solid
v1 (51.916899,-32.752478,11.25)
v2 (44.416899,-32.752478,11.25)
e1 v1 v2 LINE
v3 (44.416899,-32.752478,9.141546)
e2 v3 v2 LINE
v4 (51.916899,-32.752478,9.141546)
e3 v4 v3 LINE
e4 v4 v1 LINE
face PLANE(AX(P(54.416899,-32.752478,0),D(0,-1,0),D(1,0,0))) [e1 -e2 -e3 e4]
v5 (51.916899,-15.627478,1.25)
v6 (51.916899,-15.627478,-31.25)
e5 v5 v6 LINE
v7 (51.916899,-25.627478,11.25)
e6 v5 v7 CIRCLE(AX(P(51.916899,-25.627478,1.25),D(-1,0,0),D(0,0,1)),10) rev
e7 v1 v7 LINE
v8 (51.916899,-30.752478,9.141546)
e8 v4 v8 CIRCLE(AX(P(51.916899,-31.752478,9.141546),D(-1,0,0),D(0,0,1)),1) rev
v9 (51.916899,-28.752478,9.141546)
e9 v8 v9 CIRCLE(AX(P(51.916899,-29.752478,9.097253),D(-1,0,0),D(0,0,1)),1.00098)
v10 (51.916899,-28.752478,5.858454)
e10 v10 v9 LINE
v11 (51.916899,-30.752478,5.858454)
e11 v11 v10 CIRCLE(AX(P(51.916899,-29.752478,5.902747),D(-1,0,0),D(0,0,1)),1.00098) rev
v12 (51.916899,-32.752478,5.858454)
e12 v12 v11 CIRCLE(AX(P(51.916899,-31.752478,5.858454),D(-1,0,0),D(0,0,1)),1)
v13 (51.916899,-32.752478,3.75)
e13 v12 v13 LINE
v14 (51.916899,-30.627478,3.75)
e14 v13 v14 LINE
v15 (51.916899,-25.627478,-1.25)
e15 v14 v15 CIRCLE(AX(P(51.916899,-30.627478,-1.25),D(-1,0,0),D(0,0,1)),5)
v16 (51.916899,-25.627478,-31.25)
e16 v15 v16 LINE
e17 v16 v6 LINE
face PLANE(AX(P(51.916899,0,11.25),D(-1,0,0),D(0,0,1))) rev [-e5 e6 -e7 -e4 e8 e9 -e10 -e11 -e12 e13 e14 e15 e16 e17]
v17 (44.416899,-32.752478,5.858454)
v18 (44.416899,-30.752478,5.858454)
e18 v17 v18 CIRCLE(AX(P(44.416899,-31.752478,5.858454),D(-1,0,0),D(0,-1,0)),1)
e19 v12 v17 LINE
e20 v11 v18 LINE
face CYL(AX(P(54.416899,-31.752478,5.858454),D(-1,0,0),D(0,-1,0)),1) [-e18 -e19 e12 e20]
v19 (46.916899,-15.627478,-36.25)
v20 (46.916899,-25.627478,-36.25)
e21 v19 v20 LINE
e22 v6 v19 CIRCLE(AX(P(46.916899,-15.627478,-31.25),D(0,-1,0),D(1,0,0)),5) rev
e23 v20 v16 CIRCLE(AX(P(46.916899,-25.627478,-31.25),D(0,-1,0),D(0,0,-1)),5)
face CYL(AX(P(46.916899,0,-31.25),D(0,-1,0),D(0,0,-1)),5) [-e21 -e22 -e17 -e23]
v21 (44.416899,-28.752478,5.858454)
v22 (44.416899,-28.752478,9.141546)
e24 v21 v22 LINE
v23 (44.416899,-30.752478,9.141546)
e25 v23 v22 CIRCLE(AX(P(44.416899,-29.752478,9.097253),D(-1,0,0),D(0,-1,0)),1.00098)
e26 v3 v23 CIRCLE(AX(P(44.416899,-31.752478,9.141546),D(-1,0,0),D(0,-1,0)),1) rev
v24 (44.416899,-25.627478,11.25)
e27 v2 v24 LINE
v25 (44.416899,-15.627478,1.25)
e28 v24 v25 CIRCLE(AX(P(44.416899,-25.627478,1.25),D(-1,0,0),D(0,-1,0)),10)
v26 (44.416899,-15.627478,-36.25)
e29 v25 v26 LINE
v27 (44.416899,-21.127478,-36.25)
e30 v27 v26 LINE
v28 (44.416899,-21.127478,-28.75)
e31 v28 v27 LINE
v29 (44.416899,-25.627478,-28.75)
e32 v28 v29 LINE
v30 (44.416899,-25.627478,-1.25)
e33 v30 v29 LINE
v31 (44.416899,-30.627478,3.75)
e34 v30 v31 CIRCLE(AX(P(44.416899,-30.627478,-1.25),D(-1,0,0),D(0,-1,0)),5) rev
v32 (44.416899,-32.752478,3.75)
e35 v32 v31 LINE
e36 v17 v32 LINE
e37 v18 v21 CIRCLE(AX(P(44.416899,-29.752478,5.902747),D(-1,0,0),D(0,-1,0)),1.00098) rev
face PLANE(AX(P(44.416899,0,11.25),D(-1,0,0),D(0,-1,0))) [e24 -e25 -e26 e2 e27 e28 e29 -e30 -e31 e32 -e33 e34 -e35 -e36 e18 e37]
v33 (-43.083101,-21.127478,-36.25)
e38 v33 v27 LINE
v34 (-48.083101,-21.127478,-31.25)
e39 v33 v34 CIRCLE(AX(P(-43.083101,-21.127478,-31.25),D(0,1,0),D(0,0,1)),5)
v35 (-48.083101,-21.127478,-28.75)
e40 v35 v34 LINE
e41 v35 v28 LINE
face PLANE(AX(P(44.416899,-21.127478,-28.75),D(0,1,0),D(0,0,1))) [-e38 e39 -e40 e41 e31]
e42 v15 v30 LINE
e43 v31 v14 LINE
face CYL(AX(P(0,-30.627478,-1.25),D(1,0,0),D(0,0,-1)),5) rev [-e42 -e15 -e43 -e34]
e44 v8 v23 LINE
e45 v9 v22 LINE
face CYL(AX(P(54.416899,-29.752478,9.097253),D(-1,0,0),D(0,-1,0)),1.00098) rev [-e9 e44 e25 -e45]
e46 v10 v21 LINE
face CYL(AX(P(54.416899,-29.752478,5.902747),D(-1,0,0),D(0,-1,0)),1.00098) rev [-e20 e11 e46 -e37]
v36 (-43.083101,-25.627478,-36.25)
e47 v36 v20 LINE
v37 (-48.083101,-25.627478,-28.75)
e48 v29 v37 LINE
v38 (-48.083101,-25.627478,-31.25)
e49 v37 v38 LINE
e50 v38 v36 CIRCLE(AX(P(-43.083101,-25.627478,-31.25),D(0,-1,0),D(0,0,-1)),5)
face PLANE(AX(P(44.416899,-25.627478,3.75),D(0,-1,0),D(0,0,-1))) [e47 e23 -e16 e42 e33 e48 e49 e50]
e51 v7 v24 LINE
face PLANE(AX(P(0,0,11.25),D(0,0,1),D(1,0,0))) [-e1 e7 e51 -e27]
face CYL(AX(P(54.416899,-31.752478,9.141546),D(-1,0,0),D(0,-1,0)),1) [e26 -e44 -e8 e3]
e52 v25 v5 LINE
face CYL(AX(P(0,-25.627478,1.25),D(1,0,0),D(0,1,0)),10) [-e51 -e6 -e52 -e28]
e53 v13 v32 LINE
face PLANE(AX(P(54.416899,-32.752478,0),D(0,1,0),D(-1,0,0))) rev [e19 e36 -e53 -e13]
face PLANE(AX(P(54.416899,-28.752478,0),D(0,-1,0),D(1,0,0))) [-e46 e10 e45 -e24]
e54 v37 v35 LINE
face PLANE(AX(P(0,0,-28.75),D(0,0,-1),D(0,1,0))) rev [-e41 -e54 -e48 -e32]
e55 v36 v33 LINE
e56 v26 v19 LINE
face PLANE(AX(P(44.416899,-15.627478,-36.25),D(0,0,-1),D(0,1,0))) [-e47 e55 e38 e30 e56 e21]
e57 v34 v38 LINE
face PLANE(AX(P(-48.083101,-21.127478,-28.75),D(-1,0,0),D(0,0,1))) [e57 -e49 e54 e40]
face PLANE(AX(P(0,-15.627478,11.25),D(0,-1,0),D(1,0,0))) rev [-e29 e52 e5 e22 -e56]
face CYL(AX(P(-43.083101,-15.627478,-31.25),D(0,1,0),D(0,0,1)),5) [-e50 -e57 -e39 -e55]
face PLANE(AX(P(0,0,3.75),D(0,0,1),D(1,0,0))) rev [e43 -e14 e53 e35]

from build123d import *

# Parameters (mm, degrees)
PUSHER_BASE_DEPTH   = 15
SKETCH3_R           = 1.95
SCREW_HOLE_DEPTH    = 7.5
SKETCH6_W           = 7.5
SKETCH6_H           = 30.25
PUSHER_HEAD_DEPTH   = 3.75
FILLET1_R           = 2
SKETCH9_W           = 40
SKETCH9_H           = 10
BOSS_EXTRUDE1_DEPTH = 7.5
SKETCH10_W          = 92.5
SKETCH10_H          = 4.5
BOSS_EXTRUDE2_DEPTH = 7.5
FILLET7_R           = 10
FILLET8_R           = 5
FILLET9_START       = 44.416899441
FILLET9_DEPTH       = 7.5
CUT_EXTRUDE1_DEPTH  = 10
SKETCH13_W          = 31.257668492
SKETCH13_H          = 16.460534108
CUT_EXTRUDE2_DEPTH  = 40


with BuildPart() as part:
    # Sketch1 → pusher base (new body)
    with BuildSketch(Plane.XY):
        Polygon((59.166899441, -45.877477752), (51.666899441, -45.877477752), (44.666899441, -45.877477752), (37.166899441, -45.877477752), (37.166899441, -69.377477752), (41.916899441, -69.377477752), (41.916899441, -64.127477752), (54.416899441, -64.127477752), (54.416899441, -69.377477752), (59.166899441, -69.377477752), align=None)
        with BuildLine():
            Line((48.279417247, -51.877477752), (48.054381634, -51.877477752))
            ThreePointArc((48.054381634, -51.877477752), (39.166899441, -50.877477752), (48.054381634, -49.877477752))
            Line((48.054381634, -49.877477752), (48.279417247, -49.877477752))
            ThreePointArc((48.279417247, -49.877477752), (57.166899441, -50.877477752), (48.279417247, -51.877477752))
        make_face(mode=Mode.SUBTRACT)
    extrude(amount=PUSHER_BASE_DEPTH)

    # Sketch3 → screw hole (cut)
    with BuildSketch(Plane.XZ.offset(64.127477752)):
        with Locations(Location((48.166899441, 7.5, 0), (0, 0, 270))):
            Circle(SKETCH3_R)
    extrude(amount=-SCREW_HOLE_DEPTH, mode=Mode.SUBTRACT)

    # Sketch6 → pusher head (add, symmetric)
    with BuildSketch(Plane.XY.offset(7.5)):
        with Locations((48.166899441, -30.752477752)):
            Rectangle(SKETCH6_W, SKETCH6_H)
    extrude(amount=PUSHER_HEAD_DEPTH, both=True)

    # Fillet1
    # the kernel refuses this fillet: 2 mm, written as the material it takes off along each edge
    with BuildSketch(Plane(origin=(64.166899441, -45.877477752, 0), x_dir=(0, -1, 0), z_dir=(-1, 0, 0)), Plane(origin=(32.166899441, -45.877477752, 15), x_dir=(0, -1, 0), z_dir=(1, 0, 0))) as fillet1_piece_1:
        with BuildLine():
            CenterArc((FILLET1_R, FILLET1_R), FILLET1_R, 180, 90)
            Line((0, FILLET1_R), (0, 0))
            Line((0, 0), (FILLET1_R, 0))
        make_face()
    extrude(amount=32, mode=Mode.SUBTRACT)

    # Sketch9 → Boss-Extrude1 (add)
    with BuildSketch(Plane(origin=(51.916899441, 0, 0), x_dir=(0, 0, -1), z_dir=(1, 0, 0))):
        with Locations((16.25, -20.627477752)):
            Rectangle(SKETCH9_W, SKETCH9_H)
    extrude(amount=-BOSS_EXTRUDE1_DEPTH)

    # Sketch10 → Boss-Extrude2 (add)
    with BuildSketch(Plane(origin=(0, 0, -36.25), x_dir=(-1, 0, 0), z_dir=(0, 0, -1))):
        with Locations((1.833100559, -23.377477752)):
            Rectangle(SKETCH10_W, SKETCH10_H)
    extrude(amount=-BOSS_EXTRUDE2_DEPTH)

    # Fillet7
    fillet7_edges = [part.edges().sort_by_distance(p)[0] for p in [
        (48.166899441, -15.627477752, 11.25),
    ]]
    fillet(fillet7_edges, radius=FILLET7_R)

    # Fillet8
    fillet8_edges = [part.edges().sort_by_distance(p)[0] for p in [
        (-48.083100559, -23.377477752, -36.25),
        (48.166899441, -25.627477752, 3.75),
        (51.916899441, -20.627477752, -36.25),
    ]]
    fillet(fillet8_edges, radius=FILLET8_R)

    # Fillet9: read off the stored shape, not the designer's step
    # Fillet9 outline → Fillet9 (add)
    with BuildSketch(Plane.YZ.offset(FILLET9_START)):
        with BuildLine():
            ThreePointArc((-45.877477752, 2), (-45.935475959, 1.521848316), (-46.106106786, 1.071428571))
            ThreePointArc((-46.106106786, 1.071428571), (-44.265425216, 3.02826734), (-41.677679368, 3.75))
            Line((-41.677679368, 3.75), (-45.877477752, 3.75))
            Line((-45.877477752, 3.75), (-45.877477752, 2))
        make_face()
        with BuildLine():
            Line((-45.877477752, 13), (-45.877477752, 11.25))
            Line((-45.877477752, 11.25), (-41.677679368, 11.25))
            ThreePointArc((-41.677679368, 11.25), (-44.265425216, 11.97173266), (-46.106106785, 13.928571429))
            ThreePointArc((-46.106106785, 13.928571429), (-45.935475959, 13.478151684), (-45.877477752, 13))
        make_face()
    extrude(amount=FILLET9_DEPTH)

    # Sketch12 → Cut-Extrude1 (cut)
    with BuildSketch(Plane.ZY.offset(-44.416899441)):
        with BuildLine():
            ThreePointArc((5.858454214, -30.752477752), (6.858454214, -31.752477752), (5.858454214, -32.752477752))
            Line((5.858454214, -32.752477752), (3.75, -32.752477752))
            Line((3.75, -32.752477752), (3.75, -45.877477752))
            Line((3.75, -45.877477752), (11.25, -45.877477752))
            Line((11.25, -45.877477752), (11.25, -32.752477752))
            Line((11.25, -32.752477752), (9.141545786, -32.752477752))
            ThreePointArc((9.141545786, -32.752477752), (8.141545786, -31.752477752), (9.141545786, -30.752477752))
            ThreePointArc((9.141545786, -30.752477752), (10.09823306, -29.752477752), (9.141545786, -28.752477752))
            Line((9.141545786, -28.752477752), (5.858454214, -28.752477752))
            ThreePointArc((5.858454214, -28.752477752), (4.90176694, -29.752477752), (5.858454214, -30.752477752))
        make_face()
    extrude(amount=-CUT_EXTRUDE1_DEPTH, mode=Mode.SUBTRACT)


with BuildPart() as cut_extrude1_piece_1:
    # of the separate pieces the step leaves, piece 1, a body of its own (cut_extrude1_pieces)
    add(part.part.solids().sort_by_distance((44.416899441, -30.627477752, 3.75))[0])


with BuildPart() as cut_extrude1_piece_2:
    # of the separate pieces the step leaves, piece 2, a body of its own (cut_extrude1_pieces)
    add(part.part.solids().sort_by_distance((44.416899441, -45.877477752, 11.25))[0])

    # Sketch13 → Cut-Extrude2 (cut)
    with BuildSketch(Plane.XZ.offset(32.752477752)):
        with Locations((47.849248082, 8.230267054)):
            Rectangle(SKETCH13_W, SKETCH13_H)
    extrude(amount=CUT_EXTRUDE2_DEPTH, mode=Mode.SUBTRACT)


solid = cut_extrude1_piece_1.part
